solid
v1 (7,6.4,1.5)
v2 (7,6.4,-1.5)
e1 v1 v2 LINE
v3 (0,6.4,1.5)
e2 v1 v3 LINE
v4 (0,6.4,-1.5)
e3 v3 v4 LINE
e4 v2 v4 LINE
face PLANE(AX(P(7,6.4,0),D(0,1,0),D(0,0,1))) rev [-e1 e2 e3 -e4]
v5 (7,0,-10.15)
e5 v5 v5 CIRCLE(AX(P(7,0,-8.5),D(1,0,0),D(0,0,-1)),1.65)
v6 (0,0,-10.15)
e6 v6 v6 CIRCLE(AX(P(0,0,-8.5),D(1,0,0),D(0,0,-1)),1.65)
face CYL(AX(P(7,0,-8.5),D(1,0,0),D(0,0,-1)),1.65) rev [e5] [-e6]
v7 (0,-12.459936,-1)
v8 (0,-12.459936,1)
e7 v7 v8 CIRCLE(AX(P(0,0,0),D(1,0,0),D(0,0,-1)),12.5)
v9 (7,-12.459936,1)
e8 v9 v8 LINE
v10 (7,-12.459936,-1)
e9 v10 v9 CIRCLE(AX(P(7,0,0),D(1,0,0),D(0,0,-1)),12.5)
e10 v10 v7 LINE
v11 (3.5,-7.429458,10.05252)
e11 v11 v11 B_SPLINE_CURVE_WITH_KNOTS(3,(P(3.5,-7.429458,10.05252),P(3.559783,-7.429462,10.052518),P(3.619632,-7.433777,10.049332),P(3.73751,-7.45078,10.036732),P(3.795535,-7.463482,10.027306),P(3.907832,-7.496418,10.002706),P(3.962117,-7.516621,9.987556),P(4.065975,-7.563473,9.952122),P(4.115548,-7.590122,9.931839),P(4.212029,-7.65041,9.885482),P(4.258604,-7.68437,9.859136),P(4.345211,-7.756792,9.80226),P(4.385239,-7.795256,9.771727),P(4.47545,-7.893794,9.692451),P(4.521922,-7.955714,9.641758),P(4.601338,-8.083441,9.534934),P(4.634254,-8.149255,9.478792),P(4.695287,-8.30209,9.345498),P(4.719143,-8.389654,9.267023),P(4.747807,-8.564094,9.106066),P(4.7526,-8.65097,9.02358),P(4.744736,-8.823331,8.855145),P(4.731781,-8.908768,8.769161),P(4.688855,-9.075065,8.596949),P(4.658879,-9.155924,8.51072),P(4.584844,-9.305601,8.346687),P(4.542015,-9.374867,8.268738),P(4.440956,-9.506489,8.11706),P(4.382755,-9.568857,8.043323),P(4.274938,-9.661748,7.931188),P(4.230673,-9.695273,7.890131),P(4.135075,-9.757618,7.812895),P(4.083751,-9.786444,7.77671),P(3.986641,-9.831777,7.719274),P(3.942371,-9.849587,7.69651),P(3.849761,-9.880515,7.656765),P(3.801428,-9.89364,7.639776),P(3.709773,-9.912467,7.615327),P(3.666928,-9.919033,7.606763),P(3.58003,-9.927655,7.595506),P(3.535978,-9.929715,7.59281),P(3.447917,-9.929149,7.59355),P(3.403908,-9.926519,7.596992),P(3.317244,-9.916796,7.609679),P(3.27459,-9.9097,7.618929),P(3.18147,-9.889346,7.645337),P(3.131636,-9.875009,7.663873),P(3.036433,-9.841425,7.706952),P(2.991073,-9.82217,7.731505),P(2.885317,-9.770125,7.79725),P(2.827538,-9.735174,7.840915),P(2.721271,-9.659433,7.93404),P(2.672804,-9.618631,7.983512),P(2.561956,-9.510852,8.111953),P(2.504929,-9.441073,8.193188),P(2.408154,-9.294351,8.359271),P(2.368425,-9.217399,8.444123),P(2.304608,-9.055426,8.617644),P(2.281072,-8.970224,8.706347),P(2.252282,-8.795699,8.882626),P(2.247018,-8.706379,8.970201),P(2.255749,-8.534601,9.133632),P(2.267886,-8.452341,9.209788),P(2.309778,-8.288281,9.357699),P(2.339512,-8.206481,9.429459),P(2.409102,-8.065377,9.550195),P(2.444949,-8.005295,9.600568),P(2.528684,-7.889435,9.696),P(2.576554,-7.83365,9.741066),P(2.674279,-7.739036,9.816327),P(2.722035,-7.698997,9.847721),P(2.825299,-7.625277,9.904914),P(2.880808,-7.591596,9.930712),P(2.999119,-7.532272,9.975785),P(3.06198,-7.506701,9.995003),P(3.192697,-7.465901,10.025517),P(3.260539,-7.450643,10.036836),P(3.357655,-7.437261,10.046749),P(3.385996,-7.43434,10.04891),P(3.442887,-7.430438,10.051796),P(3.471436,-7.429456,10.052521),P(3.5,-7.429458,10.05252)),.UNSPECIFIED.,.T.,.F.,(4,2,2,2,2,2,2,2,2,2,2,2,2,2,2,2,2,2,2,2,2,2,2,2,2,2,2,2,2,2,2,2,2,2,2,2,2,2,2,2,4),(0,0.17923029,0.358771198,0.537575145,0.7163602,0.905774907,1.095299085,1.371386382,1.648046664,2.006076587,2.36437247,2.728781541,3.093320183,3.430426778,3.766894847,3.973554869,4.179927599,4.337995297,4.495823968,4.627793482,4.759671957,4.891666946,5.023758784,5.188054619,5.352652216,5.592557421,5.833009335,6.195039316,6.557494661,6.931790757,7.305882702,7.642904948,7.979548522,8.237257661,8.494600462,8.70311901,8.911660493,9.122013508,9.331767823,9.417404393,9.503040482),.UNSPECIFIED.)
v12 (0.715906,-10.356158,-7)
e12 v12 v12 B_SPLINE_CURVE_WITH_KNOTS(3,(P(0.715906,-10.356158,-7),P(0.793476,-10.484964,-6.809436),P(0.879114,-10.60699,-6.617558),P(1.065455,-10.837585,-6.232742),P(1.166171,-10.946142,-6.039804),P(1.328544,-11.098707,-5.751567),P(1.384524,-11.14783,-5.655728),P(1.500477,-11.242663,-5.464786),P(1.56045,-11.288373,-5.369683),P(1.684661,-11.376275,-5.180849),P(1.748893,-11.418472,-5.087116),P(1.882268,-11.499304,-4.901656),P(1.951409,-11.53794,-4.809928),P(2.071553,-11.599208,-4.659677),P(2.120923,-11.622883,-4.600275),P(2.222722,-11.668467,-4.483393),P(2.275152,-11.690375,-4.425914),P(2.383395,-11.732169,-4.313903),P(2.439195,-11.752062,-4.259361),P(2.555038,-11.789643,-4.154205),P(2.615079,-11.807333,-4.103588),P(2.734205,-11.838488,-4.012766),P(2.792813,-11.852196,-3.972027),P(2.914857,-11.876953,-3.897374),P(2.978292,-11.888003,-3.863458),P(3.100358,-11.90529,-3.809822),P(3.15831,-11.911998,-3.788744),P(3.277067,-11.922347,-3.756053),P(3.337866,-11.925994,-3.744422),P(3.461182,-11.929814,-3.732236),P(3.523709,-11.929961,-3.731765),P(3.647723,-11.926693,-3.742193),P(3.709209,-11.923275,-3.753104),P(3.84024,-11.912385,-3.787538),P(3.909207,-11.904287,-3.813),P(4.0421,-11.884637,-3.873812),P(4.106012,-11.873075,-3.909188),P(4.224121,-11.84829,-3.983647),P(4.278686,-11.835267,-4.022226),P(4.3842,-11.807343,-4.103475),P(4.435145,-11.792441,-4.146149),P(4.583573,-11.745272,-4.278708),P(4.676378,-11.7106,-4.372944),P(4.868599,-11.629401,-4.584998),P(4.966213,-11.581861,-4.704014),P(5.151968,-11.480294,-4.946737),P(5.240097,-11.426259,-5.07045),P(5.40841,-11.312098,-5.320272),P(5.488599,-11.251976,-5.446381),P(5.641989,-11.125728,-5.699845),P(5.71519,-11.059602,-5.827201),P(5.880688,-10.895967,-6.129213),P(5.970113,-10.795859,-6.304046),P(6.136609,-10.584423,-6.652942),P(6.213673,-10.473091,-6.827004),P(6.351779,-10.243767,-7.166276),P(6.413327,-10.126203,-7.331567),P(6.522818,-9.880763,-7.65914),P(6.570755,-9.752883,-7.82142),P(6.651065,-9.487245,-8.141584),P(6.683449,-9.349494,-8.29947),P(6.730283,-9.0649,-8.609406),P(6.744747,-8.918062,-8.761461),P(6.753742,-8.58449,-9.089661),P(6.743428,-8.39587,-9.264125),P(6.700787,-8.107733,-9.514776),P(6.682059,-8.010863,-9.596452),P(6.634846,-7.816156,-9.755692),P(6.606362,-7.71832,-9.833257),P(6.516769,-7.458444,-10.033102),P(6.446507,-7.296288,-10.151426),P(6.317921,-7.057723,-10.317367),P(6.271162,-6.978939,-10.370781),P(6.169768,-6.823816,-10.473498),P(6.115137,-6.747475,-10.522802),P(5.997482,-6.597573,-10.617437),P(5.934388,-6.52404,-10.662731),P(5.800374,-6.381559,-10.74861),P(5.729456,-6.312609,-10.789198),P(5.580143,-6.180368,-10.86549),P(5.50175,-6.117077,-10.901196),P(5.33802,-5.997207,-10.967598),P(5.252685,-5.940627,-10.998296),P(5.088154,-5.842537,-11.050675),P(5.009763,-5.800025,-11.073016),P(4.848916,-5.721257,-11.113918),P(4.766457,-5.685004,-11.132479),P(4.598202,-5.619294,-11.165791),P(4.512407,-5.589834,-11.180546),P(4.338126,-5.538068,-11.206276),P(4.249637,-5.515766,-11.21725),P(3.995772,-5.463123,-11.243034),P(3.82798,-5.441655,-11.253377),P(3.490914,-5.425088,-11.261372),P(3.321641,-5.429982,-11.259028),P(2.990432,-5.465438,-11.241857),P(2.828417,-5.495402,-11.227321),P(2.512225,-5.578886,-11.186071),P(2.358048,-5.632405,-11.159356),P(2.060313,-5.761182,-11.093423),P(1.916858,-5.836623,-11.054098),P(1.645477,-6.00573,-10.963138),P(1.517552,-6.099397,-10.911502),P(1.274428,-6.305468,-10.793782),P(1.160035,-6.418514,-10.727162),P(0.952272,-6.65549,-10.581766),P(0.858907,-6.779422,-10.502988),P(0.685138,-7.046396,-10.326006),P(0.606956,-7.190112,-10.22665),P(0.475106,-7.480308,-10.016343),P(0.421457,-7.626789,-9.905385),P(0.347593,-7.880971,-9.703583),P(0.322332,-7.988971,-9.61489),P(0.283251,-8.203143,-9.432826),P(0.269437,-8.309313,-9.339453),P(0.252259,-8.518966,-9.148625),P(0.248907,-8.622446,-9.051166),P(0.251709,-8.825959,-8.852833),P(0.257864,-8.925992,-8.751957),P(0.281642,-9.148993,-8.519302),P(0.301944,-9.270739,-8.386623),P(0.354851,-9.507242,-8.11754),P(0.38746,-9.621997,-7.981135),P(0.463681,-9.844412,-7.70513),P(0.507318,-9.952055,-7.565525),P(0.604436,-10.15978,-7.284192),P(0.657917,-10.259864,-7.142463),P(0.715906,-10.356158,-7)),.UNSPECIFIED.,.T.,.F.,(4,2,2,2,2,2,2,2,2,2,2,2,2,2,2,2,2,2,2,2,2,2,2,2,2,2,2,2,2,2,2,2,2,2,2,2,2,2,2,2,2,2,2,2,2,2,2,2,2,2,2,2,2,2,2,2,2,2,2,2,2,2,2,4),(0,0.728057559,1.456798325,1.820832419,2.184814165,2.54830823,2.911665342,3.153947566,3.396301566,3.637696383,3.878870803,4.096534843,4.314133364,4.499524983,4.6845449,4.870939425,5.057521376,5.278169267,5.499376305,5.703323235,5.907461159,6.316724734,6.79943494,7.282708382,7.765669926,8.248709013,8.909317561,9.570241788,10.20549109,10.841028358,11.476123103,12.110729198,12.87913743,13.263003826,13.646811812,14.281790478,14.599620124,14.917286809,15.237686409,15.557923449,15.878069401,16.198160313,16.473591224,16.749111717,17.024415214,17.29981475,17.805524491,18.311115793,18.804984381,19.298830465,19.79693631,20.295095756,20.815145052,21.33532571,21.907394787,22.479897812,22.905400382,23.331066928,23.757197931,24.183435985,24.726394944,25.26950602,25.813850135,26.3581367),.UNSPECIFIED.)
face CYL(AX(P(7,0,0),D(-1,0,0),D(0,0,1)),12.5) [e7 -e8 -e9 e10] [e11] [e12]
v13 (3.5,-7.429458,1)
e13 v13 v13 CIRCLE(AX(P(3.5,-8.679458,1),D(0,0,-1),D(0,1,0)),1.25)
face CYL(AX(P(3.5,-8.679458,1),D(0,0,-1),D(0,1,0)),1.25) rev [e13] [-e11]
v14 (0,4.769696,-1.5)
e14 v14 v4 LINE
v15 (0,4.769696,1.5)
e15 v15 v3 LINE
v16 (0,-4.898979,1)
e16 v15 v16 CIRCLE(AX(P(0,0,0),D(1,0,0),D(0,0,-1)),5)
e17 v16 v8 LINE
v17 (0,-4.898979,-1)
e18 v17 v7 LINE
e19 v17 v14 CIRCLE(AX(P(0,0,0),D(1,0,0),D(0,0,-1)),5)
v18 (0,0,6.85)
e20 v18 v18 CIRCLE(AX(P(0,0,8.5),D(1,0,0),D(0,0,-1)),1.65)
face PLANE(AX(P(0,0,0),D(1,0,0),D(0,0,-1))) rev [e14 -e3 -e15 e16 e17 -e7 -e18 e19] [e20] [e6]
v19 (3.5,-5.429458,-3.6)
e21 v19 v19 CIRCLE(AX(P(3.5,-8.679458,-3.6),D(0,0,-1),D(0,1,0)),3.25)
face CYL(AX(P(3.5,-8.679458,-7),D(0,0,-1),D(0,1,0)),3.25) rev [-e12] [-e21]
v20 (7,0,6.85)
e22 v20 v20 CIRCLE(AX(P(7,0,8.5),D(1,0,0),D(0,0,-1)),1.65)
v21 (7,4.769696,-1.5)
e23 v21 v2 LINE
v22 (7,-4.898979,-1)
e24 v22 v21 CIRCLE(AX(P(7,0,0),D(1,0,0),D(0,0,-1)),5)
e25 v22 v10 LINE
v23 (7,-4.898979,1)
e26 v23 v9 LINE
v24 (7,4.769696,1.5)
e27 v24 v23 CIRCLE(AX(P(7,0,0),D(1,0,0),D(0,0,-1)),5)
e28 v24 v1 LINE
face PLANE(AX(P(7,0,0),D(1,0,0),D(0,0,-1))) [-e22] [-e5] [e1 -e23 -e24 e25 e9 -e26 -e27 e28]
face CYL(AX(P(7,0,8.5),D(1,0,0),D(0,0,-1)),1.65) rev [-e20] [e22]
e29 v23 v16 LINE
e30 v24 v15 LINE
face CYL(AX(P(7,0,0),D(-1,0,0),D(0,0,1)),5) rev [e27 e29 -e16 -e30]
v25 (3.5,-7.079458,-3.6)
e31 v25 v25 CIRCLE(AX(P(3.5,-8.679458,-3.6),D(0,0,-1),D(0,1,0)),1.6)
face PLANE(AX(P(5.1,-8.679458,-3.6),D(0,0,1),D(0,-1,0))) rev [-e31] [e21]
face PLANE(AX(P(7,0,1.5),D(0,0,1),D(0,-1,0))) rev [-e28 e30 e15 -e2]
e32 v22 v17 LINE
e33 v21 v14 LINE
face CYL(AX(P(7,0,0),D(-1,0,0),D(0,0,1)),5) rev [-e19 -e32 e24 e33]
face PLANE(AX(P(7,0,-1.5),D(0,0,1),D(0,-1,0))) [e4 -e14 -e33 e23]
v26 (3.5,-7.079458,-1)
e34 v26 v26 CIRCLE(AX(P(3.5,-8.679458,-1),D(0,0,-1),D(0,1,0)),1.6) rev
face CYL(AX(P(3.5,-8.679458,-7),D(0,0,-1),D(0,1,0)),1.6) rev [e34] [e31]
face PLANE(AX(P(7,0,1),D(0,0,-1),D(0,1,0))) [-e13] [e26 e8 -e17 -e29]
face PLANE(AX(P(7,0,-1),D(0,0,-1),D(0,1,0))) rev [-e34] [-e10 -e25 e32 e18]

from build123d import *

# Parameters (mm, degrees)
SKETCH1_R                                           = 1
BOSS_EXTRUDE1_DEPTH                                 = 7
SKETCH3_W                                           = 1.25
SKETCH3_H                                           = 11.5
CBORE_FOR_M3_HEX_SOCKET_HEAD_CAP_SCREW1_D           = 3.2
CBORE_FOR_M3_HEX_SOCKET_HEAD_CAP_SCREW1_DEPTH       = 6
CBORE_FOR_M3_HEX_SOCKET_HEAD_CAP_SCREW1_CBORE_D     = 6.5
CBORE_FOR_M3_HEX_SOCKET_HEAD_CAP_SCREW1_CBORE_DEPTH = 3.4
CBORE_FOR_M3_HEX_SOCKET_HEAD_CAP_SCREW1_TIP         = 0.96137699
SKETCH9_R                                           = 3.25
CUT_EXTRUDE1_DEPTH                                  = 22.551334231
TAP_DRILL_FOR_M4_TAP1_OUTLINE_R                     = 1.65
TAP_DRILL_FOR_M4_TAP1_OUTLINE_R_2                   = 1
TAP_DRILL_FOR_M4_TAP1_DEPTH                         = 7


# Read off the part's stored shape, not the designer's step: Tap Drill for M4 Tap1
with BuildPart() as part:
    # Sketch1 → Boss-Extrude1 (new body)
    with BuildSketch(Plane(origin=(0, 0, 0), x_dir=(0, 0, -1), z_dir=(1, 0, 0))):
        with BuildLine():
            ThreePointArc((-1, -4.898979486), (-4.993327693, -0.258221909), (-1.5, 4.769696007))
            Line((-1.5, 4.769696007), (-1.5, 6.4))
            Line((-1.5, 6.4), (1.5, 6.4))
            Line((1.5, 6.4), (1.5, 4.769696007))
            ThreePointArc((1.5, 4.769696007), (4.031128874, 2.958039892), (5, 0))
            ThreePointArc((5, 0), (3.872983346, -3.16227766), (1, -4.898979486))
            Line((1, -4.898979486), (1, -12.459935794))
            ThreePointArc((1, -12.459935794), (9.185586535, -8.477912479), (12.5, 0))
            ThreePointArc((12.5, 0), (-8.477912479, 9.185586535), (-1, -12.459935794))
            Line((-1, -12.459935794), (-1, -4.898979486))
        make_face()
        with Locations((-8.5, 0)):
            Circle(SKETCH1_R, mode=Mode.SUBTRACT)
        with Locations((8.5, 0)):
            Circle(SKETCH1_R, mode=Mode.SUBTRACT)
    extrude(amount=BOSS_EXTRUDE1_DEPTH)

    # Sketch3 → Tap Drill for M3 Tap2 (revolve, cut)
    with BuildSketch(Plane(origin=(3.5, -8.67945764, 1), x_dir=(0, 1, 0), z_dir=(1, 0, 0))):
        with Locations((0.625, 5.75)):
            Rectangle(SKETCH3_W, SKETCH3_H)
    revolve(axis=Axis((3.5, -8.67945764, -5.35), (0, 0, 1)), mode=Mode.SUBTRACT)

    # CBORE for M3 Hex Socket Head Cap Screw1
    with Locations(Plane(origin=(0, 0, -7), x_dir=(-1, 0, 0), z_dir=(0, 0, -1))):
        with Locations((-3.5, -8.67945764)):
            CounterBoreHole(CBORE_FOR_M3_HEX_SOCKET_HEAD_CAP_SCREW1_D / 2, CBORE_FOR_M3_HEX_SOCKET_HEAD_CAP_SCREW1_CBORE_D / 2, CBORE_FOR_M3_HEX_SOCKET_HEAD_CAP_SCREW1_CBORE_DEPTH, depth=CBORE_FOR_M3_HEX_SOCKET_HEAD_CAP_SCREW1_DEPTH)
            with Locations((0, 0, -(CBORE_FOR_M3_HEX_SOCKET_HEAD_CAP_SCREW1_DEPTH + CBORE_FOR_M3_HEX_SOCKET_HEAD_CAP_SCREW1_TIP / 2))):  # 118° drill point
                Cone(0, CBORE_FOR_M3_HEX_SOCKET_HEAD_CAP_SCREW1_D / 2, CBORE_FOR_M3_HEX_SOCKET_HEAD_CAP_SCREW1_TIP, mode=Mode.SUBTRACT)

    # Sketch9 → Cut-Extrude1 (cut, through all)
    with BuildSketch(Plane(origin=(0, 0, -3.6), x_dir=(-1, 0, 0), z_dir=(0, 0, -1))):
        with Locations(Location((-3.5, -8.67945764, 0), (0, 0, 90))):
            Circle(SKETCH9_R)
    extrude(amount=CUT_EXTRUDE1_DEPTH, mode=Mode.SUBTRACT)

    # Tap Drill for M4 Tap1 outline → Tap Drill for M4 Tap1 (cut)
    # profile 1 of 2: a face of its own
    with BuildSketch(Plane.YZ):
        with Locations((0, 8.5)):
            Circle(TAP_DRILL_FOR_M4_TAP1_OUTLINE_R)
        with Locations((0, 8.5)):
            Circle(TAP_DRILL_FOR_M4_TAP1_OUTLINE_R_2, mode=Mode.SUBTRACT)
    # profile 2 of 2: a face of its own
    with BuildSketch(Plane.YZ):
        with Locations((0, -8.5)):
            Circle(TAP_DRILL_FOR_M4_TAP1_OUTLINE_R)
        with Locations((0, -8.5)):
            Circle(TAP_DRILL_FOR_M4_TAP1_OUTLINE_R_2, mode=Mode.SUBTRACT)
    extrude(amount=TAP_DRILL_FOR_M4_TAP1_DEPTH, mode=Mode.SUBTRACT)


solid = part.part
